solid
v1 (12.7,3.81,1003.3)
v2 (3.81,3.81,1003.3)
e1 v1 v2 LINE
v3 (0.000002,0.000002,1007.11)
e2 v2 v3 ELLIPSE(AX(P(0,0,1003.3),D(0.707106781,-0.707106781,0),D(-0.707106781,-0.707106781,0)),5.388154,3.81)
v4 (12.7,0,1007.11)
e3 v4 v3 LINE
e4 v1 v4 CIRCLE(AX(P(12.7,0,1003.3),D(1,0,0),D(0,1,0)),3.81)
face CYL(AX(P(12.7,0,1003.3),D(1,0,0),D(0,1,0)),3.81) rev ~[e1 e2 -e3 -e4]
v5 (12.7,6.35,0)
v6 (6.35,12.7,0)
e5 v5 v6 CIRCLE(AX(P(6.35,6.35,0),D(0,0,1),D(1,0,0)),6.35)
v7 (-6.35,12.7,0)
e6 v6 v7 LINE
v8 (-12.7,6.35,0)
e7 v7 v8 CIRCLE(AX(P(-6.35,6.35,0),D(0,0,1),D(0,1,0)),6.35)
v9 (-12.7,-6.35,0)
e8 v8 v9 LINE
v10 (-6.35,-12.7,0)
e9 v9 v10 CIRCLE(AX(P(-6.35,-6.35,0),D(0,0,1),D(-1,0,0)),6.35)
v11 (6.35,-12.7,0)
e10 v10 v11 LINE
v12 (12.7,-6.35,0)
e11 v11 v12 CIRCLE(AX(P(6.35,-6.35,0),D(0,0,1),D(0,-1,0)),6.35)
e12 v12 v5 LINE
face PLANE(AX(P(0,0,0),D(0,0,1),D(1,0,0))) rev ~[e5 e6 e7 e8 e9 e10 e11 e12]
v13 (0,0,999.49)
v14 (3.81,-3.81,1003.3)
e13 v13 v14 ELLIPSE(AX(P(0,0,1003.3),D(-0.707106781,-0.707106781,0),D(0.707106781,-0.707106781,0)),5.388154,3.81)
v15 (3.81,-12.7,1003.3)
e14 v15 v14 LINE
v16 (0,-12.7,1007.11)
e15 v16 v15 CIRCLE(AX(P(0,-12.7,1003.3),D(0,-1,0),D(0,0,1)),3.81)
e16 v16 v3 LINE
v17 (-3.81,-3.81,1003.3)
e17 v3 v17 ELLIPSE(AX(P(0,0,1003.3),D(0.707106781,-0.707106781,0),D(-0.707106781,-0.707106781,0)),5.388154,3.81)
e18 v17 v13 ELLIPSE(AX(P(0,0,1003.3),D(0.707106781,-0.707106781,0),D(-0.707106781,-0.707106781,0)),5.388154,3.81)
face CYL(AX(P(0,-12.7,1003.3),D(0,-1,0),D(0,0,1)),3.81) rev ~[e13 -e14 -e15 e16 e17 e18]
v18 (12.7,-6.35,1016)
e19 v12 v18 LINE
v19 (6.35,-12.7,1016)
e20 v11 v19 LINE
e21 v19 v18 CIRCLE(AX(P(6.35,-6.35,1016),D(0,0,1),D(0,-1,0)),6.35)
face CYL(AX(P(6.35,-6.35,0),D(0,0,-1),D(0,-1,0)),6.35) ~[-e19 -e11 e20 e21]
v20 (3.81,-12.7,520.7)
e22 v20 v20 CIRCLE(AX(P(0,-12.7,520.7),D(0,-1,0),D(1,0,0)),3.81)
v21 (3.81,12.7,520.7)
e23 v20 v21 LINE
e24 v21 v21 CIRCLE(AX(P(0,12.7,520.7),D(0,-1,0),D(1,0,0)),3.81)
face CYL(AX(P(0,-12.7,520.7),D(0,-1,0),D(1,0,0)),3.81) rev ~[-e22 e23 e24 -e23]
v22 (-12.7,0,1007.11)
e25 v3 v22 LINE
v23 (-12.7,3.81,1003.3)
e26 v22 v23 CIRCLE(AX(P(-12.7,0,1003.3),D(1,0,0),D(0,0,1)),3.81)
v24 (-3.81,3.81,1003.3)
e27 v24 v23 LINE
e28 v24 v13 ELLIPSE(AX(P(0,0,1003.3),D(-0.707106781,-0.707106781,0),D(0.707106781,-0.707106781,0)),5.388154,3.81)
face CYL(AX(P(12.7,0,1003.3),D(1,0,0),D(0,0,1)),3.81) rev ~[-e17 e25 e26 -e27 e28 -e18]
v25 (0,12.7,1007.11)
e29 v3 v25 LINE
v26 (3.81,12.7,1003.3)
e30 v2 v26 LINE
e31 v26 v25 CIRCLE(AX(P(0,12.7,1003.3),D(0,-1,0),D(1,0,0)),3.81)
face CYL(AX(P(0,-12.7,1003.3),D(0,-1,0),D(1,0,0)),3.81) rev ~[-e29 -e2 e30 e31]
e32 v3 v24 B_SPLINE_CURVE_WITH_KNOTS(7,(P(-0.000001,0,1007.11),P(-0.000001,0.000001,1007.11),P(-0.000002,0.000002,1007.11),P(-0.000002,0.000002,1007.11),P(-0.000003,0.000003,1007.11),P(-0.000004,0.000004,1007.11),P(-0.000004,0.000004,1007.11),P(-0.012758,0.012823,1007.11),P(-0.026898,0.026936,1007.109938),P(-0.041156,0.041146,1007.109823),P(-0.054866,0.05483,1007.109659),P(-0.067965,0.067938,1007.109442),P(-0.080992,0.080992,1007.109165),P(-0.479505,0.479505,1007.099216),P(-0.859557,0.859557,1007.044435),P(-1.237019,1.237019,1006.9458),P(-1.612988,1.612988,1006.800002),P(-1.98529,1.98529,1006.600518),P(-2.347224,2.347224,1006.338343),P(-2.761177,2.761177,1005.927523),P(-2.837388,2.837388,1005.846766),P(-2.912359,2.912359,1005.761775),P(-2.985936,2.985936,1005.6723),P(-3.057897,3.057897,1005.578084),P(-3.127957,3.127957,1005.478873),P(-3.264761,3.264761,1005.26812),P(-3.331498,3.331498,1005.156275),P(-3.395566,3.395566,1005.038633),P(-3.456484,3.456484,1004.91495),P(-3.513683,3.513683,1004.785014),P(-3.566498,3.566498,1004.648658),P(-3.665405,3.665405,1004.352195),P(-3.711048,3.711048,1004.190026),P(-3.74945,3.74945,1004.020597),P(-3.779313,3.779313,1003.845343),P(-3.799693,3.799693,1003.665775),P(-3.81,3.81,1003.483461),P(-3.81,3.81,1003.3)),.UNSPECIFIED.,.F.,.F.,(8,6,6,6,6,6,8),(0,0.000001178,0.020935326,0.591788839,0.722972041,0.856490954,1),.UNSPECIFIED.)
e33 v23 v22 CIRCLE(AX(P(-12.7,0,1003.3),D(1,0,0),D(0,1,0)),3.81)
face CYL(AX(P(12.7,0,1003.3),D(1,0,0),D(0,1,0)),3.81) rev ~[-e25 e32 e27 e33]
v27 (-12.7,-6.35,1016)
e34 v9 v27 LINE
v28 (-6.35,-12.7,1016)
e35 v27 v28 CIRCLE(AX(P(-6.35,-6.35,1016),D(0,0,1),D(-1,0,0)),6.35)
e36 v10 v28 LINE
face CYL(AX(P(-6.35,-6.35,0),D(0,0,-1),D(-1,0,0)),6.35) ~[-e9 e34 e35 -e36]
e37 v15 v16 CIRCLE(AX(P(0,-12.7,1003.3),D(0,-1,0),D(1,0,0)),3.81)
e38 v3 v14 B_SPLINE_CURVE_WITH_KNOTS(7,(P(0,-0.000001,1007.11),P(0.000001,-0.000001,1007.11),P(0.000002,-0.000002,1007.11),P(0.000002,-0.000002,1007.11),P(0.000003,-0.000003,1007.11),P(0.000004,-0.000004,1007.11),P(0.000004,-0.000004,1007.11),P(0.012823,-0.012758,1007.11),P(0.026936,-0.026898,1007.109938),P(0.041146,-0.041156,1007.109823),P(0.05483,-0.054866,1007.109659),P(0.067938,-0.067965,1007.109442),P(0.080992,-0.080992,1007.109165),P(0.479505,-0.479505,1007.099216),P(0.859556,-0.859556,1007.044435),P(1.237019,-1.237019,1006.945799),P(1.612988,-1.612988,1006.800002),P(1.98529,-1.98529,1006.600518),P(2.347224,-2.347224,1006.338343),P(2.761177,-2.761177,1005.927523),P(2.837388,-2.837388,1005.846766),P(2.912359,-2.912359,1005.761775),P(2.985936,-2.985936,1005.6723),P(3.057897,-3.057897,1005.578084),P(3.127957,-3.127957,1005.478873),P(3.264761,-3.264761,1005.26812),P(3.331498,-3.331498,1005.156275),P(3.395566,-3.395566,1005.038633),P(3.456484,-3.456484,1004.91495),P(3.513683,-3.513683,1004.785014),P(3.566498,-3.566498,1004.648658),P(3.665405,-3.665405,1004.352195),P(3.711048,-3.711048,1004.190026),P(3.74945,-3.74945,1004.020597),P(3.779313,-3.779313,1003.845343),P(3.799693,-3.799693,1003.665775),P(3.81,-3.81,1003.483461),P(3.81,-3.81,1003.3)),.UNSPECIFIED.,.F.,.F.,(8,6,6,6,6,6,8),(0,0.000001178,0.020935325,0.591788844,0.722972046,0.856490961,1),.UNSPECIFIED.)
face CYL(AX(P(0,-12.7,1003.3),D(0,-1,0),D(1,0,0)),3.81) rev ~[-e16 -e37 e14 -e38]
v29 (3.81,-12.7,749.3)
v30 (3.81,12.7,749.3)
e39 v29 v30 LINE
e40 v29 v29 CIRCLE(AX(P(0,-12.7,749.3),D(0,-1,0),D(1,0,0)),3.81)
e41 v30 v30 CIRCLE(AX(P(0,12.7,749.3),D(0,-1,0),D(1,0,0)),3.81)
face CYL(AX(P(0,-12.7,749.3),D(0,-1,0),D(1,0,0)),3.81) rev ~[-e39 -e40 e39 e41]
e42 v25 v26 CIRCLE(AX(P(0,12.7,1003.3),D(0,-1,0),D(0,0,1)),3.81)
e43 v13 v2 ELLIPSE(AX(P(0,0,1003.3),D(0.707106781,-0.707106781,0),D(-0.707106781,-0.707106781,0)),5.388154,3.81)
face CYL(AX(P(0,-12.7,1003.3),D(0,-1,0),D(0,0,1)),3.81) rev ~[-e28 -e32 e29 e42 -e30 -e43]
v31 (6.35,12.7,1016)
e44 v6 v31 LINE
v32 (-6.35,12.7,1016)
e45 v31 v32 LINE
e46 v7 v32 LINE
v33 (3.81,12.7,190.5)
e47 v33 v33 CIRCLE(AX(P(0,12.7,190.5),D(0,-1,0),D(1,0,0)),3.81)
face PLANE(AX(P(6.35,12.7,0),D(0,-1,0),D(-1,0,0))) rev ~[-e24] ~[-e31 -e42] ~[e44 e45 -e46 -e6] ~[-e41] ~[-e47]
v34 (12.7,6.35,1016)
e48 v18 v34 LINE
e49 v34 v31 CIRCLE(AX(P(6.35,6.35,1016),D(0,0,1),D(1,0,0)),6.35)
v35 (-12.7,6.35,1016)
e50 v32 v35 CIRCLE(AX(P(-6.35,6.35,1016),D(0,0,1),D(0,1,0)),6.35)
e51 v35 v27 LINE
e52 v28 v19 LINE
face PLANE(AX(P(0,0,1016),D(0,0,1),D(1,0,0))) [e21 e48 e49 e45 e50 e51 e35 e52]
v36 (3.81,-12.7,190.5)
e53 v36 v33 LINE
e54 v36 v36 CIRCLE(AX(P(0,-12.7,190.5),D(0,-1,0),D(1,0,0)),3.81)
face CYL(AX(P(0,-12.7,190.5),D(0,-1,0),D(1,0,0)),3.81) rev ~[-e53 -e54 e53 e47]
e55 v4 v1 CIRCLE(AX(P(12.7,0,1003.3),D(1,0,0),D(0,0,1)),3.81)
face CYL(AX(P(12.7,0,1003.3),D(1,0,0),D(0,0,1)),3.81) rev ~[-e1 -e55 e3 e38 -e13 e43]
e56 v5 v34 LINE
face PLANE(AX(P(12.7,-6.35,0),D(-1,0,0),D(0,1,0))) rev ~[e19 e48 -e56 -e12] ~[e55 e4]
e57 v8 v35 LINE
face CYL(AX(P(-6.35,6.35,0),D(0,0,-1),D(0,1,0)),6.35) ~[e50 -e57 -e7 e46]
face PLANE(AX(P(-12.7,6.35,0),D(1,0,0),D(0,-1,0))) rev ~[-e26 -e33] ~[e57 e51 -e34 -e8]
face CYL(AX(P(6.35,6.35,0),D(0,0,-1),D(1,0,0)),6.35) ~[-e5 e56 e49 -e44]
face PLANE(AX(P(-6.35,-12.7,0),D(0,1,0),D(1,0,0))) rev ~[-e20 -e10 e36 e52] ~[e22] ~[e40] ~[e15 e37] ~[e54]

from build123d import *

# Parameters (mm, degrees)
F1_DEPTH = 1016
F3_DEPTH = 25.4
F5_DEPTH = 25.4
F2_R     = 3.81
F6_DEPTH = 25.4
F7_DEPTH = 25.4


# Not quite as in the source:
# - a feature names something its author has since deleted; it is built from what else it names


with BuildPart() as f1:
    # F0 (on Top) → F1 (new body)
    with BuildSketch(Plane.XY):
        with BuildLine():
            ThreePointArc((12.7, 6.35), (10.8401280605, 10.8401280605), (6.35, 12.7))
            Line((6.35, 12.7), (-6.35, 12.7))
            ThreePointArc((-6.35, 12.7), (-10.8401280605, 10.8401280605), (-12.7, 6.35))
            Line((-12.7, 6.35), (-12.7, -6.35))
            ThreePointArc((-12.7, -6.35), (-10.8401280605, -10.8401280605), (-6.35, -12.7))
            Line((-6.35, -12.7), (6.35, -12.7))
            ThreePointArc((6.35, -12.7), (10.8401280605, -10.8401280605), (12.7, -6.35))
            Line((12.7, -6.35), (12.7, 6.35))
        make_face()
    extrude(amount=F1_DEPTH)

    # F2 (on face) → F3 (cut)
    with BuildSketch(Plane.XZ.offset(12.7)):
        with BuildLine():
            ThreePointArc((3.81, 1003.3), (2.6940768363, 1005.9940768363), (0, 1007.11))
            ThreePointArc((0, 1007.11), (-2.6940768363, 1000.6059231637), (3.81, 1003.3))
        make_face()
    extrude(amount=-F3_DEPTH, mode=Mode.SUBTRACT)

    # F4 (on face) → F5 (cut)
    with BuildSketch(Plane.YZ.offset(12.7)):
        with BuildLine():
            ThreePointArc((3.81, 1003.3), (2.6940768363, 1005.9940768363), (0, 1007.11))
            ThreePointArc((0, 1007.11), (-2.6940768363, 1000.6059231637), (3.81, 1003.3))
        make_face()
    extrude(amount=-F5_DEPTH, mode=Mode.SUBTRACT)

    # F2 (on face) → F6 (cut)
    with BuildSketch(Plane.XZ.offset(12.7)):
        with Locations((0, 749.3)):
            Circle(F2_R)
        with Locations((0, 520.7)):
            Circle(F2_R)
    extrude(amount=-F6_DEPTH, mode=Mode.SUBTRACT)

    # F2 (on face) → F7 (cut)
    with BuildSketch(Plane.XZ.offset(12.7)):
        with Locations((0, 190.5)):
            Circle(F2_R)
    extrude(amount=-F7_DEPTH, mode=Mode.SUBTRACT)


solid = f1.part
